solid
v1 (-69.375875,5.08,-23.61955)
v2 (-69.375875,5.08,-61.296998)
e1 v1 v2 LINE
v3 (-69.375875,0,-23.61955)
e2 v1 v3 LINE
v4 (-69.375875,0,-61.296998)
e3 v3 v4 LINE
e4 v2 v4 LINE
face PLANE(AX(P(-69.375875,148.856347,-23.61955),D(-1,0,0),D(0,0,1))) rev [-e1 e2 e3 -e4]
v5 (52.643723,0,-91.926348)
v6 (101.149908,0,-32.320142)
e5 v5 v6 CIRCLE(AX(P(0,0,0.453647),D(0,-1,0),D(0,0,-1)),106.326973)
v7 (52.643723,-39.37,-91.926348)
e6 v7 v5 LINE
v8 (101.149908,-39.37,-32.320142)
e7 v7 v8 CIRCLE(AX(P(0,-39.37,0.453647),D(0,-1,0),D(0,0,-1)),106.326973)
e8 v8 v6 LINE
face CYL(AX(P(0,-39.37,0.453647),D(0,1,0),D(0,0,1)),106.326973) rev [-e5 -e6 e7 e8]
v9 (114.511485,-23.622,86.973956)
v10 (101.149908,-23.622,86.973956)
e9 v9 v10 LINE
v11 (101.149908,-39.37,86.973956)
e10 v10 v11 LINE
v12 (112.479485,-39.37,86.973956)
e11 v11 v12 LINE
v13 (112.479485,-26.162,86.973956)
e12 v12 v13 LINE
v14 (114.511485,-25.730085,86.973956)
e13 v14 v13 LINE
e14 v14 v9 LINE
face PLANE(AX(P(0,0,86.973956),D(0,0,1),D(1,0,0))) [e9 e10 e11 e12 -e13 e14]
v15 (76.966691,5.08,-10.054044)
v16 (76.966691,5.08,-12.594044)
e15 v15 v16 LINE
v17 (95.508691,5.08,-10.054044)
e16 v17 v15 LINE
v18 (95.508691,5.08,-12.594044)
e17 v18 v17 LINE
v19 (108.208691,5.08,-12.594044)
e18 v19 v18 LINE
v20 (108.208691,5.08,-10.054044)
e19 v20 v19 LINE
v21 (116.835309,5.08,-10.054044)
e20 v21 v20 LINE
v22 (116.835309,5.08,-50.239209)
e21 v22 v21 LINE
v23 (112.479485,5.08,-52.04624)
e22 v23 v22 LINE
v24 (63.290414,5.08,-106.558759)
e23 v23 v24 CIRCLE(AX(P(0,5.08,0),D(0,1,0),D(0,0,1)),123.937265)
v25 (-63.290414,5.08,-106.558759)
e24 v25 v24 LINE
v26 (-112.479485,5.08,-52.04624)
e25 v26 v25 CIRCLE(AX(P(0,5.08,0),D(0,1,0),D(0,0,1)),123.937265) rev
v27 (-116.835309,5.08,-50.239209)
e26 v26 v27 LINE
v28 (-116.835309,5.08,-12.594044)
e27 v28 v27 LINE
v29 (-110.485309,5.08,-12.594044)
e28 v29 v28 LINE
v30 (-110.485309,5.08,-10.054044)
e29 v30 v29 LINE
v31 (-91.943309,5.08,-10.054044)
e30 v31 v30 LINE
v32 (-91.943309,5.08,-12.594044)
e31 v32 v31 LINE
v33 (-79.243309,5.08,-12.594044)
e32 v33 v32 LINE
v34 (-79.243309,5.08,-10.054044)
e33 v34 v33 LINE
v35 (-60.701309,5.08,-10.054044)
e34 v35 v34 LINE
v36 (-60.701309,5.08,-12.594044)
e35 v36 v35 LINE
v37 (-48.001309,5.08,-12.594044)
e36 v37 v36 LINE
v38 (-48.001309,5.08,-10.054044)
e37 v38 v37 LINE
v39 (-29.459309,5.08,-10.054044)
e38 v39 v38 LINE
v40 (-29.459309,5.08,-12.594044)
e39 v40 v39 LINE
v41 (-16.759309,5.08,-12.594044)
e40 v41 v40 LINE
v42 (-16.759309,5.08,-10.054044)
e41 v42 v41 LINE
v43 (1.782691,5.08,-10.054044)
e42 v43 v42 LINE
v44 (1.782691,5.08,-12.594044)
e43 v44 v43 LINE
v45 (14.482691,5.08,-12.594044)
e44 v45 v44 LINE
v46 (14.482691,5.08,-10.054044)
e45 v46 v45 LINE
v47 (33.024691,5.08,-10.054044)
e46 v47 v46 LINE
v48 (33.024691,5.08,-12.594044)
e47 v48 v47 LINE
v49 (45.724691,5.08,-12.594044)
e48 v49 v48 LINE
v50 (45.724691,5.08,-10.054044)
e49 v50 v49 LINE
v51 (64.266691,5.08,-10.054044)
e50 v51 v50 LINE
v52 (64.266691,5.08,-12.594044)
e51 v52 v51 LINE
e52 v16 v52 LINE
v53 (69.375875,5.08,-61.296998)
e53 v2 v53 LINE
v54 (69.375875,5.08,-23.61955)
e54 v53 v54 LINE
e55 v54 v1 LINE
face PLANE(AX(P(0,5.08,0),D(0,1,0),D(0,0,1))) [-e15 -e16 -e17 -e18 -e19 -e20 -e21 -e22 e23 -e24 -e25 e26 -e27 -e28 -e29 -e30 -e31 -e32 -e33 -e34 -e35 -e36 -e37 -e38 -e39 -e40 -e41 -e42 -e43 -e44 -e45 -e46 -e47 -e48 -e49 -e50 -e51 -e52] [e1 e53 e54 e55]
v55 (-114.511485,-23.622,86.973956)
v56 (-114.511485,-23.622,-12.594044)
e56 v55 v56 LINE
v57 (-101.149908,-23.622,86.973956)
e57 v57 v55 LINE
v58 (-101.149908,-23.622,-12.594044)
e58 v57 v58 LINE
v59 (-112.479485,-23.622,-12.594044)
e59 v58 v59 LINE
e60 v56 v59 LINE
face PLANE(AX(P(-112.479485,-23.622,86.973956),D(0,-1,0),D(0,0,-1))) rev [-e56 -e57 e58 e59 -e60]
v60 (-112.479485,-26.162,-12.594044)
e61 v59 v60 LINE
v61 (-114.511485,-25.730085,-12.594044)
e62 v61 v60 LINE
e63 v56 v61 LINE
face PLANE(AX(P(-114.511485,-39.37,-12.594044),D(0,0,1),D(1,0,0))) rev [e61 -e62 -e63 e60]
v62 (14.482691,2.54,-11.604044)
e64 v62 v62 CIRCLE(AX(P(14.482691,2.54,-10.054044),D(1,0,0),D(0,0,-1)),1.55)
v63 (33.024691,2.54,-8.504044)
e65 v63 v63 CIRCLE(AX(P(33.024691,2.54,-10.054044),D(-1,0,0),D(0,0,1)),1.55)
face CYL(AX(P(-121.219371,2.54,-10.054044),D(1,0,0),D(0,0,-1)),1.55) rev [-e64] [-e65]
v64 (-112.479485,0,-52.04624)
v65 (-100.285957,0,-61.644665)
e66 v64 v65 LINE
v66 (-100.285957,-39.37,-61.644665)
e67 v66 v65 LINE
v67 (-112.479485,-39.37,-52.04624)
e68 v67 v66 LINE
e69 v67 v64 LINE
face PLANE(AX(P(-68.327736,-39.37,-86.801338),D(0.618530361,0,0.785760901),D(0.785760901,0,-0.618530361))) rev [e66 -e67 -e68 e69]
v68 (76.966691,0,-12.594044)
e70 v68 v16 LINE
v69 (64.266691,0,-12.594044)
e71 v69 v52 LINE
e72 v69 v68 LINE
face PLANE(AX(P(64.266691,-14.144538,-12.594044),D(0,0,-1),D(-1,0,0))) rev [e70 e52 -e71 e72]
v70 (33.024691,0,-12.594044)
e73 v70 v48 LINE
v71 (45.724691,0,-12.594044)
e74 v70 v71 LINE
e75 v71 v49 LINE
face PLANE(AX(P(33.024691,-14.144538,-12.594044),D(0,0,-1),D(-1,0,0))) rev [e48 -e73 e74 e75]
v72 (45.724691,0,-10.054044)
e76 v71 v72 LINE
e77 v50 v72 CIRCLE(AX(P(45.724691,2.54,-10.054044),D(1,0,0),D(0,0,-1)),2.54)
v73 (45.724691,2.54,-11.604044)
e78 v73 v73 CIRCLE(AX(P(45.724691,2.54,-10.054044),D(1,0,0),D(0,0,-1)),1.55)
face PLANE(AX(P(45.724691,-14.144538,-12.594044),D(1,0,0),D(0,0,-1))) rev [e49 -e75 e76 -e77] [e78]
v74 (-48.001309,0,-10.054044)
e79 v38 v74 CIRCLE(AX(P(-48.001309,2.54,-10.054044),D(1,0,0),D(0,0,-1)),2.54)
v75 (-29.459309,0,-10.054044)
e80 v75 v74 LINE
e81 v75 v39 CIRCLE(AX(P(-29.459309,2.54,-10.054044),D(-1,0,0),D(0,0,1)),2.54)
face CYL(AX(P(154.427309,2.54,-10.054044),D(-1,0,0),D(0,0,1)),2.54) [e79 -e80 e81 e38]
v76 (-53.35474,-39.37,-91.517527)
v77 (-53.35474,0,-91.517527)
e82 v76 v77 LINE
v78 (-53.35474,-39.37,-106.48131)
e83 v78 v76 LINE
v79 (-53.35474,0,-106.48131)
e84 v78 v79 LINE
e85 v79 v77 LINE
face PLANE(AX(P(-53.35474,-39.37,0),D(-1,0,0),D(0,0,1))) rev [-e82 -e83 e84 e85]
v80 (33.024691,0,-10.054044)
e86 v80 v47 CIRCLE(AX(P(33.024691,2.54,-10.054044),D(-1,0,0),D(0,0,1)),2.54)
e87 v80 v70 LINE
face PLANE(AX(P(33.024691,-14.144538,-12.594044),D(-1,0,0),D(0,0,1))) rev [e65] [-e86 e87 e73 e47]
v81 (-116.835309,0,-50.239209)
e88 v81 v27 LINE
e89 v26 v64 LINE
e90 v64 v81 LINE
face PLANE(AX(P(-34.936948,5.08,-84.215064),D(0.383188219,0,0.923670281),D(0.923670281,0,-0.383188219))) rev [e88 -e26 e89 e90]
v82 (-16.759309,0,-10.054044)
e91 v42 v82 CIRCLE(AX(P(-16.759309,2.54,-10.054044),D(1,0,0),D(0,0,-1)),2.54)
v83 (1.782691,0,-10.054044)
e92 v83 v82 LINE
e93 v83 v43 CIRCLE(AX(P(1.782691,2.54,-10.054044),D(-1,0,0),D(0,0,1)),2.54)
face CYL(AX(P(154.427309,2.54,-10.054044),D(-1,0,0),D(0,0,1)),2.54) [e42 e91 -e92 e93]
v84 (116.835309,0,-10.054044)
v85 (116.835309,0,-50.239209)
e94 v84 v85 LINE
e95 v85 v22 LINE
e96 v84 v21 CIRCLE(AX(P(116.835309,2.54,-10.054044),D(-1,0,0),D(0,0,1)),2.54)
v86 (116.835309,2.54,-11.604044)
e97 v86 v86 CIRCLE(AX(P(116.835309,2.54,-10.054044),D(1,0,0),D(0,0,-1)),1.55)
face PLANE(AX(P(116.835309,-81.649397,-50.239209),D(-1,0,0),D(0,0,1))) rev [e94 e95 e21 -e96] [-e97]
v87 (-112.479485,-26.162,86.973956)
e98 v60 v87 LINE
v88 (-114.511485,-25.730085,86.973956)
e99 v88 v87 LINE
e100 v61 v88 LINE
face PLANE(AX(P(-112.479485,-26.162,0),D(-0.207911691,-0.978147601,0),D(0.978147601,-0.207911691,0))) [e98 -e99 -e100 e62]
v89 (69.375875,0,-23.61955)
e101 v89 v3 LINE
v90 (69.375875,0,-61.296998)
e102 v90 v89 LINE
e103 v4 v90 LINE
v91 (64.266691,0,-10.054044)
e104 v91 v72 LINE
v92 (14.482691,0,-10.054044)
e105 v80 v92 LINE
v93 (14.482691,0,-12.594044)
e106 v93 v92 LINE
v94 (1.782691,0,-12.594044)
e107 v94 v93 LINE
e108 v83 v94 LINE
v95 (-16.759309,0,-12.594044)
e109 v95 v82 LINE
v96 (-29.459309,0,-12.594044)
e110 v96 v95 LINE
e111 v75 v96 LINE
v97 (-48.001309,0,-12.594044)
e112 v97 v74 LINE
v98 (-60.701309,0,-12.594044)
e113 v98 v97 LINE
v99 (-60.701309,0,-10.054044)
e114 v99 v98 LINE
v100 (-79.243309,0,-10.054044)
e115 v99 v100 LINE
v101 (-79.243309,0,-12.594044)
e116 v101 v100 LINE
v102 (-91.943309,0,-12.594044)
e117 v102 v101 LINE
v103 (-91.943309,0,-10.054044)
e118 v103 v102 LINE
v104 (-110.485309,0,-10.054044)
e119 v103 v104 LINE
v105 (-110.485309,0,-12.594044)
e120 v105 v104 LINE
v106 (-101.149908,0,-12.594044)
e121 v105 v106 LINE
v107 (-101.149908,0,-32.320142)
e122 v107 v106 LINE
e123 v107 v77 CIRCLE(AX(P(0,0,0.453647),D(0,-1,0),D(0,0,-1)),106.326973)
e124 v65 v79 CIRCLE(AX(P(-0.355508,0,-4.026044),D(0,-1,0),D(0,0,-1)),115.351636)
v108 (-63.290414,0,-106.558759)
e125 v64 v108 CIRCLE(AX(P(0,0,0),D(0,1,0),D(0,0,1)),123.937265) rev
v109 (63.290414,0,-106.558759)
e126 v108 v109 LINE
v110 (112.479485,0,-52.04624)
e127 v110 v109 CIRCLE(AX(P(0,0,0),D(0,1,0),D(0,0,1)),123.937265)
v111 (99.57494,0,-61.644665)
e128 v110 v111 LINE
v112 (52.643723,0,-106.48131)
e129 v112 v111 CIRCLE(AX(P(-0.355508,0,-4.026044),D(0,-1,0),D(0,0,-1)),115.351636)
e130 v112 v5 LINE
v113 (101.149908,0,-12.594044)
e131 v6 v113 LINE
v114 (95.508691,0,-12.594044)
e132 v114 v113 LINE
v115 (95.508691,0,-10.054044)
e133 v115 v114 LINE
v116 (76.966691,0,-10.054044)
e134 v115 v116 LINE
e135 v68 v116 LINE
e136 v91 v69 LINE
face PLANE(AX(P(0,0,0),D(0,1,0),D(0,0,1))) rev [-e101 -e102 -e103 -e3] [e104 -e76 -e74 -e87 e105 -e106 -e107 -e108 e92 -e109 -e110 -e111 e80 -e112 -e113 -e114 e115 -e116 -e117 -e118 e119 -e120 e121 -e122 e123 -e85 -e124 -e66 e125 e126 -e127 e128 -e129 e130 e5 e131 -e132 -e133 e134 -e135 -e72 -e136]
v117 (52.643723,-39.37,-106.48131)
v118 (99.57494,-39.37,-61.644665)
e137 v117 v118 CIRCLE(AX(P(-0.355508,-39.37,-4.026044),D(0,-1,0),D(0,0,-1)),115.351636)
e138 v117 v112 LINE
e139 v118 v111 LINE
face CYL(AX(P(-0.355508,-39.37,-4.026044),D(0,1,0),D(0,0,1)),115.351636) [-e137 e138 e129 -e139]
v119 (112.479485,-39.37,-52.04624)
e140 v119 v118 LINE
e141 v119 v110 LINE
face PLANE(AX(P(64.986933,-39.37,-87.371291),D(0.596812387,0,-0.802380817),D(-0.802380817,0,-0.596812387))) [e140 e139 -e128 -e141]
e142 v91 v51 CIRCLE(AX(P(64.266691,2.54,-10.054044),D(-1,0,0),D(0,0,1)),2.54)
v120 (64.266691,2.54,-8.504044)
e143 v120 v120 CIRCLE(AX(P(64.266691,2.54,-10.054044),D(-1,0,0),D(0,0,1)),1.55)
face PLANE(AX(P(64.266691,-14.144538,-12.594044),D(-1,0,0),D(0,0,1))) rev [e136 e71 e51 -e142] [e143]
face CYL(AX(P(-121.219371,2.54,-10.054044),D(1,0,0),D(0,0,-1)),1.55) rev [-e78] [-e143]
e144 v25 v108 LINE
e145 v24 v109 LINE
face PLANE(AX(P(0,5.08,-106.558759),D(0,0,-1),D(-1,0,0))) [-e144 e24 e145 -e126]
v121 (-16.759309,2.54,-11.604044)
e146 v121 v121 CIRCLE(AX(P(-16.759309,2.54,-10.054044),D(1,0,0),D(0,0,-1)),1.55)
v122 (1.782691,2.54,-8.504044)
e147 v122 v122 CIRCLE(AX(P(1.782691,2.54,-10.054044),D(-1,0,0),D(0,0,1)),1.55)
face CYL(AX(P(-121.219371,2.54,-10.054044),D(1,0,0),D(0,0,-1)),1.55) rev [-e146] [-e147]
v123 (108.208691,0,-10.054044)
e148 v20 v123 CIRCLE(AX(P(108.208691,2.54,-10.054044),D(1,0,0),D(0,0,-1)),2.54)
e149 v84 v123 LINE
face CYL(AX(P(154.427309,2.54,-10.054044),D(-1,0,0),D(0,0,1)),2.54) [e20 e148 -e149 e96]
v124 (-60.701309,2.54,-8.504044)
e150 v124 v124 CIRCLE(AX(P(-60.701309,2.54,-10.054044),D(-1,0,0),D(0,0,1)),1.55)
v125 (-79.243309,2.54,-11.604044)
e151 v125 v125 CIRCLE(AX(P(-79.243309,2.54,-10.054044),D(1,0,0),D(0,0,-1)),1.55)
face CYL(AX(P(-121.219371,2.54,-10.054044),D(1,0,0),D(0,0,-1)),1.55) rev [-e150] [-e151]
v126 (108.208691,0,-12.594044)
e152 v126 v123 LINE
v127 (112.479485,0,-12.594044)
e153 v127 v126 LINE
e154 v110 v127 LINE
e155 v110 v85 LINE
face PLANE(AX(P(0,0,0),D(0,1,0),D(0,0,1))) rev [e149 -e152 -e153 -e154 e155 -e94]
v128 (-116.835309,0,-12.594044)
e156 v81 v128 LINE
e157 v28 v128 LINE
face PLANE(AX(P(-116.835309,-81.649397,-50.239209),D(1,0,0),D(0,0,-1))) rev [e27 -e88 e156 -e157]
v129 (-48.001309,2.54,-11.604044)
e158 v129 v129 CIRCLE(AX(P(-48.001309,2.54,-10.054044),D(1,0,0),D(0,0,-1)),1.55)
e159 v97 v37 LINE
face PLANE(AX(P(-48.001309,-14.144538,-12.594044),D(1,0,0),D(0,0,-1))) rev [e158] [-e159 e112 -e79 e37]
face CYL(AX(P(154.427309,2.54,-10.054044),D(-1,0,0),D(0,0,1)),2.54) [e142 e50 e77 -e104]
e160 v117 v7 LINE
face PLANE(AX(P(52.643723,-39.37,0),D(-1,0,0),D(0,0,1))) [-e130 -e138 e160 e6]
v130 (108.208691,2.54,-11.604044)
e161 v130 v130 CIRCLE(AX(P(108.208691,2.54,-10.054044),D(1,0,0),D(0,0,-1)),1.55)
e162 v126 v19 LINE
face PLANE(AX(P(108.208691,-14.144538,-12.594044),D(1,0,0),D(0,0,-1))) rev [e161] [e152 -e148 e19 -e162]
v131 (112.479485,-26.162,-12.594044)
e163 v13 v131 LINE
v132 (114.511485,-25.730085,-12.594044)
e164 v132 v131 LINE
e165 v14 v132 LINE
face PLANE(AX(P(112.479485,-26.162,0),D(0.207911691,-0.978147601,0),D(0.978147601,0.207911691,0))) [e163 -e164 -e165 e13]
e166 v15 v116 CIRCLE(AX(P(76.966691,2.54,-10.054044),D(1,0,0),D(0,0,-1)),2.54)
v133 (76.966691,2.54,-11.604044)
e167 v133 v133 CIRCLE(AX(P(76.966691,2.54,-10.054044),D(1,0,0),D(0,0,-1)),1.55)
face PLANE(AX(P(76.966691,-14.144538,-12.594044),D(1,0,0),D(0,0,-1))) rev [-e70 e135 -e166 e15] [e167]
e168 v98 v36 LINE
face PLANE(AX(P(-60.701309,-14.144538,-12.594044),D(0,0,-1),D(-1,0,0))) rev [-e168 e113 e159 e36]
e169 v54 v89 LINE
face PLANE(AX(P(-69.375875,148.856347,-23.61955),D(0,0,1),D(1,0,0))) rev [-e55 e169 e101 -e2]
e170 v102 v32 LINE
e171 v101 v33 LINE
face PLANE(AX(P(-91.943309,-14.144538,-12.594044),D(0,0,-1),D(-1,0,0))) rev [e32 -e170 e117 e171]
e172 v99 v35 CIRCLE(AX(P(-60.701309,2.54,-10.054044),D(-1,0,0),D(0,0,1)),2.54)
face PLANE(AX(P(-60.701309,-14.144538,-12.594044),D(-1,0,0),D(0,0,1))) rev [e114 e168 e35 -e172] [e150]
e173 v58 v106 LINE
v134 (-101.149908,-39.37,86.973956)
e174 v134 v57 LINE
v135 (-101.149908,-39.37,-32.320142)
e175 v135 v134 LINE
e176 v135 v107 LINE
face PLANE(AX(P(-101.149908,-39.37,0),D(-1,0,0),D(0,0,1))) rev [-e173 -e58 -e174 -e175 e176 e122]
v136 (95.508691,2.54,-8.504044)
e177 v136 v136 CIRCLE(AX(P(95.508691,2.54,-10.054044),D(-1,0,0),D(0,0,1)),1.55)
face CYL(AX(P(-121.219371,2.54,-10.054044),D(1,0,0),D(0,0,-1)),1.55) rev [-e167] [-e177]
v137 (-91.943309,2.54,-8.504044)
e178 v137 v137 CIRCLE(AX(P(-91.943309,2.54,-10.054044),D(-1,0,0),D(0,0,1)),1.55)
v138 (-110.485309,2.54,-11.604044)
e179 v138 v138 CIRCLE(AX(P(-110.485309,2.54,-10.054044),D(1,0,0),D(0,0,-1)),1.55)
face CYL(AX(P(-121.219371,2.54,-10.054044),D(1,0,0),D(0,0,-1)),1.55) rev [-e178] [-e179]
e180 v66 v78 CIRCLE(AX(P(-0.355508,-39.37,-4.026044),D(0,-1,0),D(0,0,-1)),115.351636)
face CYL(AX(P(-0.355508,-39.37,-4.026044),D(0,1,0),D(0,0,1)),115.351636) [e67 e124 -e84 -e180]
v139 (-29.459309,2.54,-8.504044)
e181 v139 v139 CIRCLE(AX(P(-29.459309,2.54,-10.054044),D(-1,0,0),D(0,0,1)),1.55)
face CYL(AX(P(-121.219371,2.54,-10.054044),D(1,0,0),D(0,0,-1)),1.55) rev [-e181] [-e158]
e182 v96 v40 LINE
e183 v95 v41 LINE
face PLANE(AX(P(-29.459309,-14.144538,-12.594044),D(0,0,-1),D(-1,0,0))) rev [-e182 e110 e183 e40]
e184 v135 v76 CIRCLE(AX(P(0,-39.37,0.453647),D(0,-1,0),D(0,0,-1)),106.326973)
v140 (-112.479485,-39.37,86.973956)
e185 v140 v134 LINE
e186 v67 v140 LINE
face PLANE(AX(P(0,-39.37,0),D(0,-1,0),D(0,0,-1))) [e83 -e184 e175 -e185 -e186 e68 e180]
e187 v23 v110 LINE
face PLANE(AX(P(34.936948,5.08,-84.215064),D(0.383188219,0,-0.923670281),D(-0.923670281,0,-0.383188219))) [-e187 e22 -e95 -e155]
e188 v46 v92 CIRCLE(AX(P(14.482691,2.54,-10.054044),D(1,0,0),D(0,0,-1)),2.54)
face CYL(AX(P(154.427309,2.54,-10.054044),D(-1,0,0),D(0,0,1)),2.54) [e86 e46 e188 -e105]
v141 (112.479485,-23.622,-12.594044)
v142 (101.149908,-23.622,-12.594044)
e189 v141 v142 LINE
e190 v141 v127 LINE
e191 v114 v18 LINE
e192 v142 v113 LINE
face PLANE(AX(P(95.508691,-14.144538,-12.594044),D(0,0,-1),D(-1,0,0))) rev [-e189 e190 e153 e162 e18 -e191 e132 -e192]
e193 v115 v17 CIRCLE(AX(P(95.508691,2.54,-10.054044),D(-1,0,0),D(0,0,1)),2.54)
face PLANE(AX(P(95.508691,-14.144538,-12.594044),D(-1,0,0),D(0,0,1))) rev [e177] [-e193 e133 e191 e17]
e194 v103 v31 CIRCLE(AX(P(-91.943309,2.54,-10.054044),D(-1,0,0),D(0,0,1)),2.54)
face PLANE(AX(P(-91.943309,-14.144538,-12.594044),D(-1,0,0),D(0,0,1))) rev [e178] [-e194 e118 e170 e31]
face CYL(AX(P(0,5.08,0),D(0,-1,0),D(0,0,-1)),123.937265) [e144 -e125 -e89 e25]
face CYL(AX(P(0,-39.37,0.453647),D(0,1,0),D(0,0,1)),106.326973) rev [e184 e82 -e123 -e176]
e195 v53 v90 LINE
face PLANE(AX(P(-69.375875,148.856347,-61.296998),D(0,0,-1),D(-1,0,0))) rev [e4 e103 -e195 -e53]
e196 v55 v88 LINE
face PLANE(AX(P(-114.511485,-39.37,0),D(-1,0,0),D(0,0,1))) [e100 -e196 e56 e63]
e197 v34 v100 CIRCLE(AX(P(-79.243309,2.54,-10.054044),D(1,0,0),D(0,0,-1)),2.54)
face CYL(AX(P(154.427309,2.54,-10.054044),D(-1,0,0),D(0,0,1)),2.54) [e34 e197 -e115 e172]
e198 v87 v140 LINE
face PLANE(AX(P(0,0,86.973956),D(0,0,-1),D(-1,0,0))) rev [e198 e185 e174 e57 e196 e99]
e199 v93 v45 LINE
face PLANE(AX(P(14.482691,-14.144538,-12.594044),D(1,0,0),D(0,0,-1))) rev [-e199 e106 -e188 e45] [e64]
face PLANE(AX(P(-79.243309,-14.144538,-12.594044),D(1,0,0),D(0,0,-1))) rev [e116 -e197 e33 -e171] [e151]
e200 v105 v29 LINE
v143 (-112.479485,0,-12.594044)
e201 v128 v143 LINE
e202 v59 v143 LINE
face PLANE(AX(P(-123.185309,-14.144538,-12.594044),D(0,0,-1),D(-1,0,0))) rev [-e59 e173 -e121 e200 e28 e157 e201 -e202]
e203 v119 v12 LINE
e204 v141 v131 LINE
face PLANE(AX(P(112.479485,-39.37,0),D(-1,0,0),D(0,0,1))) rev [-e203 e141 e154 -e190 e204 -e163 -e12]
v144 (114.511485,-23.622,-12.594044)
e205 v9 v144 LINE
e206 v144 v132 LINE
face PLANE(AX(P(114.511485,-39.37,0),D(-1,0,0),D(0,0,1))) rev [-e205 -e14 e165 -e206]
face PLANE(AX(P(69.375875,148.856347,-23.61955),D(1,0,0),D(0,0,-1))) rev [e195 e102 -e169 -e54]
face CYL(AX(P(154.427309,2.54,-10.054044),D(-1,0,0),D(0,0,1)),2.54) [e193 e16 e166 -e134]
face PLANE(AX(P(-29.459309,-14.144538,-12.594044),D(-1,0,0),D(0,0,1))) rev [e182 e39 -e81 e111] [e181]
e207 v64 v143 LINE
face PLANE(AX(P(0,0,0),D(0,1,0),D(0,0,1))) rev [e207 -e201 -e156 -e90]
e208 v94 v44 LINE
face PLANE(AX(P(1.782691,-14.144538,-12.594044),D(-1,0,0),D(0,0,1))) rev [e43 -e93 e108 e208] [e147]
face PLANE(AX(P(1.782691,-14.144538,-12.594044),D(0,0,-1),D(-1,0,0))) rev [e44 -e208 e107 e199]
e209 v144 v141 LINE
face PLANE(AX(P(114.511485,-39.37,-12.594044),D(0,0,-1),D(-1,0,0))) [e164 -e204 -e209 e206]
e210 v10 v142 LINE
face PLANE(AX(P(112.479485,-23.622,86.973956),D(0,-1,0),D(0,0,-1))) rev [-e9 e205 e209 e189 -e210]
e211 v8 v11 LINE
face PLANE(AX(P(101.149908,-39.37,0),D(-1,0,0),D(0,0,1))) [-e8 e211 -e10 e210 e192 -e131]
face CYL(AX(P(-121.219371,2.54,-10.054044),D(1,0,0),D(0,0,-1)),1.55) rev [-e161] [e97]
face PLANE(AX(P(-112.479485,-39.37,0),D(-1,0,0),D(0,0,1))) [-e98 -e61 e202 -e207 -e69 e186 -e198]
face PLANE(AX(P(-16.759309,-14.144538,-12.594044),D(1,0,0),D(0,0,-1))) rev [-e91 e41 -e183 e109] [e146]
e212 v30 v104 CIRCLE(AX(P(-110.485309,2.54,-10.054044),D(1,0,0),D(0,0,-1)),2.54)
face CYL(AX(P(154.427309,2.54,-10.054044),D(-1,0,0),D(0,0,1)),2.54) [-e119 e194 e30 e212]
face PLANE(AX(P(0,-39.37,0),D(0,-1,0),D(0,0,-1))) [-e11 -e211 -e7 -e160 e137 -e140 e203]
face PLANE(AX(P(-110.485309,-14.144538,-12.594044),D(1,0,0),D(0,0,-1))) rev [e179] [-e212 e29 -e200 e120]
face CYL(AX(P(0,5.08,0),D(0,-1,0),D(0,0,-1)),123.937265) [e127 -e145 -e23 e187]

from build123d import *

# Parameters (mm, degrees)
BOSS_EXTRUDE1_DEPTH      = 5.08
BOSS_EXTRUDE2_DEPTH      = 154.427309
BOSS_EXTRUDE2_DEPTH_BACK = 154.427309
SKETCH2_R                = 2.54
SKETCH2_W                = 2.54
SKETCH2_H                = 5.08
SKETCH3_W                = 12.7
SKETCH3_H                = 6.227195603
CUT_EXTRUDE1_DEPTH       = 5.08
BOSS_EXTRUDE3_DEPTH      = 39.37
SKETCH5_W                = 138.751749018
SKETCH5_H                = 37.67744757
CUT_EXTRUDE2_DEPTH       = 5.08
SKETCH6_W                = 11.329576632
SKETCH6_H                = 15.748
BOSS_EXTRUDE4_DEPTH      = 99.568
SKETCH7_W                = 58.494788807
SKETCH7_H                = 56.964758344
CUT_EXTRUDE3_DEPTH       = 5.08
LIP1_START               = -12.594044208
LIP1_DEPTH               = 99.568
LIP2_START               = -12.594044208
LIP2_DEPTH               = 99.568
CUT_EXTRUDE4_REACH       = 261.821
SKETCH8_R                = 1.55


# Read off the part's stored shape, not the designer's step: Lip1, Lip2
with BuildPart() as part:
    # Sketch1 → Boss-Extrude1 (new body)
    with BuildSketch(Plane(origin=(0, 0, 0), x_dir=(1, 0, 0), z_dir=(0, 1, 0))):
        with BuildLine():
            ThreePointArc((-150.649044256, 36.211449361), (-152.994577449, 24.475760888), (-154.427308629, 12.594044208))
            Line((-154.427308629, 12.594044208), (0, 12.594044208))
            Line((0, 12.594044208), (0, 106.558758971))
            Line((0, 106.558758971), (-63.290413745, 106.558758971))
            ThreePointArc((-63.290413745, 106.558758971), (-92.01449877, 83.028775744), (-112.479484736, 52.046240008))
            Line((-112.479484736, 52.046240008), (-150.649044256, 36.211449361))
        make_face()
        with BuildLine():
            Line((0, 106.558758971), (0, 12.594044208))
            Line((0, 12.594044208), (154.427308629, 12.594044208))
            ThreePointArc((154.427308629, 12.594044208), (152.994577449, 24.475760888), (150.649044256, 36.211449361))
            Line((150.649044256, 36.211449361), (112.479484736, 52.046240008))
            ThreePointArc((112.479484736, 52.046240008), (92.01449877, 83.028775744), (63.290413745, 106.558758971))
            Line((63.290413745, 106.558758971), (0, 106.558758971))
        make_face()
    extrude(amount=BOSS_EXTRUDE1_DEPTH)

    # Sketch2 → Boss-Extrude2 (add, two sides: drawn at the far end of the back side and taken through both)
    with BuildSketch(Plane(origin=(0, 0, 0), x_dir=(0, 0, -1), z_dir=(1, 0, 0)).offset(-BOSS_EXTRUDE2_DEPTH_BACK)):
        with Locations((10.054044208, 2.54)):
            Circle(SKETCH2_R)
        with Locations((11.324044208, 2.54)):
            Rectangle(SKETCH2_W, SKETCH2_H)
    extrude(amount=BOSS_EXTRUDE2_DEPTH + BOSS_EXTRUDE2_DEPTH_BACK)

    # Sketch3 → Cut-Extrude1 (cut)
    with BuildSketch(Plane(origin=(0, 5.08, 0), x_dir=(1, 0, 0), z_dir=(0, 1, 0))):
        with Locations((-116.835308629, 9.480446407)):
            Rectangle(SKETCH3_W, SKETCH3_H)
        with Locations((-148.077308629, 9.480446407)):
            Rectangle(SKETCH3_W, SKETCH3_H)
        with Locations((-85.593308629, 9.480446407)):
            Rectangle(SKETCH3_W, SKETCH3_H)
        with Locations((-54.351308629, 9.480446407)):
            Rectangle(SKETCH3_W, SKETCH3_H)
        with Locations((-23.109308629, 9.480446407)):
            Rectangle(SKETCH3_W, SKETCH3_H)
        with Locations((8.132691371, 9.480446407)):
            Rectangle(SKETCH3_W, SKETCH3_H)
        with Locations((39.374691371, 9.480446407)):
            Rectangle(SKETCH3_W, SKETCH3_H)
        with Locations((70.616691371, 9.480446407)):
            Rectangle(SKETCH3_W, SKETCH3_H)
        with Locations((101.858691371, 9.480446407)):
            Rectangle(SKETCH3_W, SKETCH3_H)
        with Locations((133.100691371, 9.480446407)):
            Rectangle(SKETCH3_W, SKETCH3_H)
    extrude(amount=-CUT_EXTRUDE1_DEPTH, mode=Mode.SUBTRACT)

    # Sketch4 → Boss-Extrude3 (add)
    with BuildSketch(Plane.XZ):
        with BuildLine():
            Line((-53.354740134, -106.481309786), (-53.354740134, -91.517526844))
            ThreePointArc((-53.354740134, -91.517526844), (-82.728496733, -66.340222196), (-101.149908104, -32.320142108))
            Line((-101.149908104, -32.320142108), (-101.149908104, -52.046240008))
            Line((-101.149908104, -52.046240008), (-112.479484736, -52.046240008))
            Line((-112.479484736, -52.046240008), (-100.285956923, -61.644665115))
            ThreePointArc((-100.285956923, -61.644665115), (-80.038963099, -87.43196163), (-53.354740134, -106.481309786))
        make_face()
        Polygon((-101.149908104, -52.046240008), (-101.149908104, -32.320142108), (-101.149908104, -12.594044208), (-110.485308629, -12.594044208), (-112.479484736, -12.594044208), (-112.479484736, -52.046240008), align=None)
        with BuildLine():
            Line((99.574939951, -61.644665115), (112.479484736, -52.046240008))
            Line((112.479484736, -52.046240008), (101.149908104, -52.046240008))
            Line((101.149908104, -52.046240008), (101.149908104, -32.320142108))
            ThreePointArc((101.149908104, -32.320142108), (82.470268628, -66.658795409), (52.643723162, -91.92634826))
            Line((52.643723162, -91.92634826), (52.643723162, -106.481309786))
            ThreePointArc((52.643723162, -106.481309786), (79.327946127, -87.43196163), (99.574939951, -61.644665115))
        make_face()
        Polygon((112.479484736, -52.046240008), (112.479484736, -12.594044208), (108.208691371, -12.594044208), (101.149908104, -12.594044208), (101.149908104, -32.320142108), (101.149908104, -52.046240008), align=None)
    extrude(amount=BOSS_EXTRUDE3_DEPTH)

    # Sketch5 → Cut-Extrude2 (cut)
    with BuildSketch(Plane.XZ):
        with Locations((0, -42.458273938)):
            Rectangle(SKETCH5_W, SKETCH5_H)
    extrude(amount=-CUT_EXTRUDE2_DEPTH, mode=Mode.SUBTRACT)

    # Sketch6 → Boss-Extrude4 (add)
    with BuildSketch(Plane.XY.offset(-12.594044208)):
        with Locations((-106.81469642, -31.496)):
            Rectangle(SKETCH6_W, SKETCH6_H)
        with Locations((106.81469642, -31.496)):
            Rectangle(SKETCH6_W, SKETCH6_H)
    extrude(amount=BOSS_EXTRUDE4_DEPTH)

    # Sketch7 → Cut-Extrude3 (cut)
    with BuildSketch(Plane(origin=(0, 5.08, 0), x_dir=(1, 0, 0), z_dir=(0, 1, 0))):
        with Locations((-146.082703033, 21.756830304)):
            Rectangle(SKETCH7_W, SKETCH7_H)
        with Locations((146.082703033, 21.756830304)):
            Rectangle(SKETCH7_W, SKETCH7_H)
    extrude(amount=-CUT_EXTRUDE3_DEPTH, mode=Mode.SUBTRACT)

    # Lip1 outline → Lip1 (add)
    with BuildSketch(Plane.XY.offset(LIP1_START)):
        Polygon((-112.479484736, -23.622), (-114.511484736, -23.622), (-114.511484736, -25.730085067), (-112.479484736, -26.162), align=None)
    extrude(amount=LIP1_DEPTH)

    # Lip2 outline → Lip2 (add)
    with BuildSketch(Plane.XY.offset(LIP2_START)):
        Polygon((114.511484736, -23.622), (112.479484736, -23.622), (112.479484736, -26.162), (114.511484736, -25.730085067), align=None)
    extrude(amount=LIP2_DEPTH)

    # Cut-Extrude4: up to this face of the body (flat: up to its plane)
    cut_extrude4_end = Plane(part.part.faces().sort_by_distance((-116.835308629, 2.54, -31.416626842))[0])
    # Sketch8 → Cut-Extrude4 (cut, up to the picked face)
    with BuildSketch(Plane(origin=(116.835308629, 0, 0), x_dir=(0, 0, -1), z_dir=(1, 0, 0)), mode=Mode.PRIVATE) as cut_extrude4_sk1:
        with Locations((10.054044208, 2.54)):
            Circle(SKETCH8_R)
    cut_extrude4_tool1 = split(extrude(cut_extrude4_sk1.sketch, amount=-CUT_EXTRUDE4_REACH, mode=Mode.PRIVATE), bisect_by=cut_extrude4_end, keep=Keep.BOTH, mode=Mode.PRIVATE)
    add(cut_extrude4_tool1.solids().sort_by(Axis((116.835309, 2.54, -10.054044), (-1, 0, 0)))[0], mode=Mode.SUBTRACT)


solid = part.part
